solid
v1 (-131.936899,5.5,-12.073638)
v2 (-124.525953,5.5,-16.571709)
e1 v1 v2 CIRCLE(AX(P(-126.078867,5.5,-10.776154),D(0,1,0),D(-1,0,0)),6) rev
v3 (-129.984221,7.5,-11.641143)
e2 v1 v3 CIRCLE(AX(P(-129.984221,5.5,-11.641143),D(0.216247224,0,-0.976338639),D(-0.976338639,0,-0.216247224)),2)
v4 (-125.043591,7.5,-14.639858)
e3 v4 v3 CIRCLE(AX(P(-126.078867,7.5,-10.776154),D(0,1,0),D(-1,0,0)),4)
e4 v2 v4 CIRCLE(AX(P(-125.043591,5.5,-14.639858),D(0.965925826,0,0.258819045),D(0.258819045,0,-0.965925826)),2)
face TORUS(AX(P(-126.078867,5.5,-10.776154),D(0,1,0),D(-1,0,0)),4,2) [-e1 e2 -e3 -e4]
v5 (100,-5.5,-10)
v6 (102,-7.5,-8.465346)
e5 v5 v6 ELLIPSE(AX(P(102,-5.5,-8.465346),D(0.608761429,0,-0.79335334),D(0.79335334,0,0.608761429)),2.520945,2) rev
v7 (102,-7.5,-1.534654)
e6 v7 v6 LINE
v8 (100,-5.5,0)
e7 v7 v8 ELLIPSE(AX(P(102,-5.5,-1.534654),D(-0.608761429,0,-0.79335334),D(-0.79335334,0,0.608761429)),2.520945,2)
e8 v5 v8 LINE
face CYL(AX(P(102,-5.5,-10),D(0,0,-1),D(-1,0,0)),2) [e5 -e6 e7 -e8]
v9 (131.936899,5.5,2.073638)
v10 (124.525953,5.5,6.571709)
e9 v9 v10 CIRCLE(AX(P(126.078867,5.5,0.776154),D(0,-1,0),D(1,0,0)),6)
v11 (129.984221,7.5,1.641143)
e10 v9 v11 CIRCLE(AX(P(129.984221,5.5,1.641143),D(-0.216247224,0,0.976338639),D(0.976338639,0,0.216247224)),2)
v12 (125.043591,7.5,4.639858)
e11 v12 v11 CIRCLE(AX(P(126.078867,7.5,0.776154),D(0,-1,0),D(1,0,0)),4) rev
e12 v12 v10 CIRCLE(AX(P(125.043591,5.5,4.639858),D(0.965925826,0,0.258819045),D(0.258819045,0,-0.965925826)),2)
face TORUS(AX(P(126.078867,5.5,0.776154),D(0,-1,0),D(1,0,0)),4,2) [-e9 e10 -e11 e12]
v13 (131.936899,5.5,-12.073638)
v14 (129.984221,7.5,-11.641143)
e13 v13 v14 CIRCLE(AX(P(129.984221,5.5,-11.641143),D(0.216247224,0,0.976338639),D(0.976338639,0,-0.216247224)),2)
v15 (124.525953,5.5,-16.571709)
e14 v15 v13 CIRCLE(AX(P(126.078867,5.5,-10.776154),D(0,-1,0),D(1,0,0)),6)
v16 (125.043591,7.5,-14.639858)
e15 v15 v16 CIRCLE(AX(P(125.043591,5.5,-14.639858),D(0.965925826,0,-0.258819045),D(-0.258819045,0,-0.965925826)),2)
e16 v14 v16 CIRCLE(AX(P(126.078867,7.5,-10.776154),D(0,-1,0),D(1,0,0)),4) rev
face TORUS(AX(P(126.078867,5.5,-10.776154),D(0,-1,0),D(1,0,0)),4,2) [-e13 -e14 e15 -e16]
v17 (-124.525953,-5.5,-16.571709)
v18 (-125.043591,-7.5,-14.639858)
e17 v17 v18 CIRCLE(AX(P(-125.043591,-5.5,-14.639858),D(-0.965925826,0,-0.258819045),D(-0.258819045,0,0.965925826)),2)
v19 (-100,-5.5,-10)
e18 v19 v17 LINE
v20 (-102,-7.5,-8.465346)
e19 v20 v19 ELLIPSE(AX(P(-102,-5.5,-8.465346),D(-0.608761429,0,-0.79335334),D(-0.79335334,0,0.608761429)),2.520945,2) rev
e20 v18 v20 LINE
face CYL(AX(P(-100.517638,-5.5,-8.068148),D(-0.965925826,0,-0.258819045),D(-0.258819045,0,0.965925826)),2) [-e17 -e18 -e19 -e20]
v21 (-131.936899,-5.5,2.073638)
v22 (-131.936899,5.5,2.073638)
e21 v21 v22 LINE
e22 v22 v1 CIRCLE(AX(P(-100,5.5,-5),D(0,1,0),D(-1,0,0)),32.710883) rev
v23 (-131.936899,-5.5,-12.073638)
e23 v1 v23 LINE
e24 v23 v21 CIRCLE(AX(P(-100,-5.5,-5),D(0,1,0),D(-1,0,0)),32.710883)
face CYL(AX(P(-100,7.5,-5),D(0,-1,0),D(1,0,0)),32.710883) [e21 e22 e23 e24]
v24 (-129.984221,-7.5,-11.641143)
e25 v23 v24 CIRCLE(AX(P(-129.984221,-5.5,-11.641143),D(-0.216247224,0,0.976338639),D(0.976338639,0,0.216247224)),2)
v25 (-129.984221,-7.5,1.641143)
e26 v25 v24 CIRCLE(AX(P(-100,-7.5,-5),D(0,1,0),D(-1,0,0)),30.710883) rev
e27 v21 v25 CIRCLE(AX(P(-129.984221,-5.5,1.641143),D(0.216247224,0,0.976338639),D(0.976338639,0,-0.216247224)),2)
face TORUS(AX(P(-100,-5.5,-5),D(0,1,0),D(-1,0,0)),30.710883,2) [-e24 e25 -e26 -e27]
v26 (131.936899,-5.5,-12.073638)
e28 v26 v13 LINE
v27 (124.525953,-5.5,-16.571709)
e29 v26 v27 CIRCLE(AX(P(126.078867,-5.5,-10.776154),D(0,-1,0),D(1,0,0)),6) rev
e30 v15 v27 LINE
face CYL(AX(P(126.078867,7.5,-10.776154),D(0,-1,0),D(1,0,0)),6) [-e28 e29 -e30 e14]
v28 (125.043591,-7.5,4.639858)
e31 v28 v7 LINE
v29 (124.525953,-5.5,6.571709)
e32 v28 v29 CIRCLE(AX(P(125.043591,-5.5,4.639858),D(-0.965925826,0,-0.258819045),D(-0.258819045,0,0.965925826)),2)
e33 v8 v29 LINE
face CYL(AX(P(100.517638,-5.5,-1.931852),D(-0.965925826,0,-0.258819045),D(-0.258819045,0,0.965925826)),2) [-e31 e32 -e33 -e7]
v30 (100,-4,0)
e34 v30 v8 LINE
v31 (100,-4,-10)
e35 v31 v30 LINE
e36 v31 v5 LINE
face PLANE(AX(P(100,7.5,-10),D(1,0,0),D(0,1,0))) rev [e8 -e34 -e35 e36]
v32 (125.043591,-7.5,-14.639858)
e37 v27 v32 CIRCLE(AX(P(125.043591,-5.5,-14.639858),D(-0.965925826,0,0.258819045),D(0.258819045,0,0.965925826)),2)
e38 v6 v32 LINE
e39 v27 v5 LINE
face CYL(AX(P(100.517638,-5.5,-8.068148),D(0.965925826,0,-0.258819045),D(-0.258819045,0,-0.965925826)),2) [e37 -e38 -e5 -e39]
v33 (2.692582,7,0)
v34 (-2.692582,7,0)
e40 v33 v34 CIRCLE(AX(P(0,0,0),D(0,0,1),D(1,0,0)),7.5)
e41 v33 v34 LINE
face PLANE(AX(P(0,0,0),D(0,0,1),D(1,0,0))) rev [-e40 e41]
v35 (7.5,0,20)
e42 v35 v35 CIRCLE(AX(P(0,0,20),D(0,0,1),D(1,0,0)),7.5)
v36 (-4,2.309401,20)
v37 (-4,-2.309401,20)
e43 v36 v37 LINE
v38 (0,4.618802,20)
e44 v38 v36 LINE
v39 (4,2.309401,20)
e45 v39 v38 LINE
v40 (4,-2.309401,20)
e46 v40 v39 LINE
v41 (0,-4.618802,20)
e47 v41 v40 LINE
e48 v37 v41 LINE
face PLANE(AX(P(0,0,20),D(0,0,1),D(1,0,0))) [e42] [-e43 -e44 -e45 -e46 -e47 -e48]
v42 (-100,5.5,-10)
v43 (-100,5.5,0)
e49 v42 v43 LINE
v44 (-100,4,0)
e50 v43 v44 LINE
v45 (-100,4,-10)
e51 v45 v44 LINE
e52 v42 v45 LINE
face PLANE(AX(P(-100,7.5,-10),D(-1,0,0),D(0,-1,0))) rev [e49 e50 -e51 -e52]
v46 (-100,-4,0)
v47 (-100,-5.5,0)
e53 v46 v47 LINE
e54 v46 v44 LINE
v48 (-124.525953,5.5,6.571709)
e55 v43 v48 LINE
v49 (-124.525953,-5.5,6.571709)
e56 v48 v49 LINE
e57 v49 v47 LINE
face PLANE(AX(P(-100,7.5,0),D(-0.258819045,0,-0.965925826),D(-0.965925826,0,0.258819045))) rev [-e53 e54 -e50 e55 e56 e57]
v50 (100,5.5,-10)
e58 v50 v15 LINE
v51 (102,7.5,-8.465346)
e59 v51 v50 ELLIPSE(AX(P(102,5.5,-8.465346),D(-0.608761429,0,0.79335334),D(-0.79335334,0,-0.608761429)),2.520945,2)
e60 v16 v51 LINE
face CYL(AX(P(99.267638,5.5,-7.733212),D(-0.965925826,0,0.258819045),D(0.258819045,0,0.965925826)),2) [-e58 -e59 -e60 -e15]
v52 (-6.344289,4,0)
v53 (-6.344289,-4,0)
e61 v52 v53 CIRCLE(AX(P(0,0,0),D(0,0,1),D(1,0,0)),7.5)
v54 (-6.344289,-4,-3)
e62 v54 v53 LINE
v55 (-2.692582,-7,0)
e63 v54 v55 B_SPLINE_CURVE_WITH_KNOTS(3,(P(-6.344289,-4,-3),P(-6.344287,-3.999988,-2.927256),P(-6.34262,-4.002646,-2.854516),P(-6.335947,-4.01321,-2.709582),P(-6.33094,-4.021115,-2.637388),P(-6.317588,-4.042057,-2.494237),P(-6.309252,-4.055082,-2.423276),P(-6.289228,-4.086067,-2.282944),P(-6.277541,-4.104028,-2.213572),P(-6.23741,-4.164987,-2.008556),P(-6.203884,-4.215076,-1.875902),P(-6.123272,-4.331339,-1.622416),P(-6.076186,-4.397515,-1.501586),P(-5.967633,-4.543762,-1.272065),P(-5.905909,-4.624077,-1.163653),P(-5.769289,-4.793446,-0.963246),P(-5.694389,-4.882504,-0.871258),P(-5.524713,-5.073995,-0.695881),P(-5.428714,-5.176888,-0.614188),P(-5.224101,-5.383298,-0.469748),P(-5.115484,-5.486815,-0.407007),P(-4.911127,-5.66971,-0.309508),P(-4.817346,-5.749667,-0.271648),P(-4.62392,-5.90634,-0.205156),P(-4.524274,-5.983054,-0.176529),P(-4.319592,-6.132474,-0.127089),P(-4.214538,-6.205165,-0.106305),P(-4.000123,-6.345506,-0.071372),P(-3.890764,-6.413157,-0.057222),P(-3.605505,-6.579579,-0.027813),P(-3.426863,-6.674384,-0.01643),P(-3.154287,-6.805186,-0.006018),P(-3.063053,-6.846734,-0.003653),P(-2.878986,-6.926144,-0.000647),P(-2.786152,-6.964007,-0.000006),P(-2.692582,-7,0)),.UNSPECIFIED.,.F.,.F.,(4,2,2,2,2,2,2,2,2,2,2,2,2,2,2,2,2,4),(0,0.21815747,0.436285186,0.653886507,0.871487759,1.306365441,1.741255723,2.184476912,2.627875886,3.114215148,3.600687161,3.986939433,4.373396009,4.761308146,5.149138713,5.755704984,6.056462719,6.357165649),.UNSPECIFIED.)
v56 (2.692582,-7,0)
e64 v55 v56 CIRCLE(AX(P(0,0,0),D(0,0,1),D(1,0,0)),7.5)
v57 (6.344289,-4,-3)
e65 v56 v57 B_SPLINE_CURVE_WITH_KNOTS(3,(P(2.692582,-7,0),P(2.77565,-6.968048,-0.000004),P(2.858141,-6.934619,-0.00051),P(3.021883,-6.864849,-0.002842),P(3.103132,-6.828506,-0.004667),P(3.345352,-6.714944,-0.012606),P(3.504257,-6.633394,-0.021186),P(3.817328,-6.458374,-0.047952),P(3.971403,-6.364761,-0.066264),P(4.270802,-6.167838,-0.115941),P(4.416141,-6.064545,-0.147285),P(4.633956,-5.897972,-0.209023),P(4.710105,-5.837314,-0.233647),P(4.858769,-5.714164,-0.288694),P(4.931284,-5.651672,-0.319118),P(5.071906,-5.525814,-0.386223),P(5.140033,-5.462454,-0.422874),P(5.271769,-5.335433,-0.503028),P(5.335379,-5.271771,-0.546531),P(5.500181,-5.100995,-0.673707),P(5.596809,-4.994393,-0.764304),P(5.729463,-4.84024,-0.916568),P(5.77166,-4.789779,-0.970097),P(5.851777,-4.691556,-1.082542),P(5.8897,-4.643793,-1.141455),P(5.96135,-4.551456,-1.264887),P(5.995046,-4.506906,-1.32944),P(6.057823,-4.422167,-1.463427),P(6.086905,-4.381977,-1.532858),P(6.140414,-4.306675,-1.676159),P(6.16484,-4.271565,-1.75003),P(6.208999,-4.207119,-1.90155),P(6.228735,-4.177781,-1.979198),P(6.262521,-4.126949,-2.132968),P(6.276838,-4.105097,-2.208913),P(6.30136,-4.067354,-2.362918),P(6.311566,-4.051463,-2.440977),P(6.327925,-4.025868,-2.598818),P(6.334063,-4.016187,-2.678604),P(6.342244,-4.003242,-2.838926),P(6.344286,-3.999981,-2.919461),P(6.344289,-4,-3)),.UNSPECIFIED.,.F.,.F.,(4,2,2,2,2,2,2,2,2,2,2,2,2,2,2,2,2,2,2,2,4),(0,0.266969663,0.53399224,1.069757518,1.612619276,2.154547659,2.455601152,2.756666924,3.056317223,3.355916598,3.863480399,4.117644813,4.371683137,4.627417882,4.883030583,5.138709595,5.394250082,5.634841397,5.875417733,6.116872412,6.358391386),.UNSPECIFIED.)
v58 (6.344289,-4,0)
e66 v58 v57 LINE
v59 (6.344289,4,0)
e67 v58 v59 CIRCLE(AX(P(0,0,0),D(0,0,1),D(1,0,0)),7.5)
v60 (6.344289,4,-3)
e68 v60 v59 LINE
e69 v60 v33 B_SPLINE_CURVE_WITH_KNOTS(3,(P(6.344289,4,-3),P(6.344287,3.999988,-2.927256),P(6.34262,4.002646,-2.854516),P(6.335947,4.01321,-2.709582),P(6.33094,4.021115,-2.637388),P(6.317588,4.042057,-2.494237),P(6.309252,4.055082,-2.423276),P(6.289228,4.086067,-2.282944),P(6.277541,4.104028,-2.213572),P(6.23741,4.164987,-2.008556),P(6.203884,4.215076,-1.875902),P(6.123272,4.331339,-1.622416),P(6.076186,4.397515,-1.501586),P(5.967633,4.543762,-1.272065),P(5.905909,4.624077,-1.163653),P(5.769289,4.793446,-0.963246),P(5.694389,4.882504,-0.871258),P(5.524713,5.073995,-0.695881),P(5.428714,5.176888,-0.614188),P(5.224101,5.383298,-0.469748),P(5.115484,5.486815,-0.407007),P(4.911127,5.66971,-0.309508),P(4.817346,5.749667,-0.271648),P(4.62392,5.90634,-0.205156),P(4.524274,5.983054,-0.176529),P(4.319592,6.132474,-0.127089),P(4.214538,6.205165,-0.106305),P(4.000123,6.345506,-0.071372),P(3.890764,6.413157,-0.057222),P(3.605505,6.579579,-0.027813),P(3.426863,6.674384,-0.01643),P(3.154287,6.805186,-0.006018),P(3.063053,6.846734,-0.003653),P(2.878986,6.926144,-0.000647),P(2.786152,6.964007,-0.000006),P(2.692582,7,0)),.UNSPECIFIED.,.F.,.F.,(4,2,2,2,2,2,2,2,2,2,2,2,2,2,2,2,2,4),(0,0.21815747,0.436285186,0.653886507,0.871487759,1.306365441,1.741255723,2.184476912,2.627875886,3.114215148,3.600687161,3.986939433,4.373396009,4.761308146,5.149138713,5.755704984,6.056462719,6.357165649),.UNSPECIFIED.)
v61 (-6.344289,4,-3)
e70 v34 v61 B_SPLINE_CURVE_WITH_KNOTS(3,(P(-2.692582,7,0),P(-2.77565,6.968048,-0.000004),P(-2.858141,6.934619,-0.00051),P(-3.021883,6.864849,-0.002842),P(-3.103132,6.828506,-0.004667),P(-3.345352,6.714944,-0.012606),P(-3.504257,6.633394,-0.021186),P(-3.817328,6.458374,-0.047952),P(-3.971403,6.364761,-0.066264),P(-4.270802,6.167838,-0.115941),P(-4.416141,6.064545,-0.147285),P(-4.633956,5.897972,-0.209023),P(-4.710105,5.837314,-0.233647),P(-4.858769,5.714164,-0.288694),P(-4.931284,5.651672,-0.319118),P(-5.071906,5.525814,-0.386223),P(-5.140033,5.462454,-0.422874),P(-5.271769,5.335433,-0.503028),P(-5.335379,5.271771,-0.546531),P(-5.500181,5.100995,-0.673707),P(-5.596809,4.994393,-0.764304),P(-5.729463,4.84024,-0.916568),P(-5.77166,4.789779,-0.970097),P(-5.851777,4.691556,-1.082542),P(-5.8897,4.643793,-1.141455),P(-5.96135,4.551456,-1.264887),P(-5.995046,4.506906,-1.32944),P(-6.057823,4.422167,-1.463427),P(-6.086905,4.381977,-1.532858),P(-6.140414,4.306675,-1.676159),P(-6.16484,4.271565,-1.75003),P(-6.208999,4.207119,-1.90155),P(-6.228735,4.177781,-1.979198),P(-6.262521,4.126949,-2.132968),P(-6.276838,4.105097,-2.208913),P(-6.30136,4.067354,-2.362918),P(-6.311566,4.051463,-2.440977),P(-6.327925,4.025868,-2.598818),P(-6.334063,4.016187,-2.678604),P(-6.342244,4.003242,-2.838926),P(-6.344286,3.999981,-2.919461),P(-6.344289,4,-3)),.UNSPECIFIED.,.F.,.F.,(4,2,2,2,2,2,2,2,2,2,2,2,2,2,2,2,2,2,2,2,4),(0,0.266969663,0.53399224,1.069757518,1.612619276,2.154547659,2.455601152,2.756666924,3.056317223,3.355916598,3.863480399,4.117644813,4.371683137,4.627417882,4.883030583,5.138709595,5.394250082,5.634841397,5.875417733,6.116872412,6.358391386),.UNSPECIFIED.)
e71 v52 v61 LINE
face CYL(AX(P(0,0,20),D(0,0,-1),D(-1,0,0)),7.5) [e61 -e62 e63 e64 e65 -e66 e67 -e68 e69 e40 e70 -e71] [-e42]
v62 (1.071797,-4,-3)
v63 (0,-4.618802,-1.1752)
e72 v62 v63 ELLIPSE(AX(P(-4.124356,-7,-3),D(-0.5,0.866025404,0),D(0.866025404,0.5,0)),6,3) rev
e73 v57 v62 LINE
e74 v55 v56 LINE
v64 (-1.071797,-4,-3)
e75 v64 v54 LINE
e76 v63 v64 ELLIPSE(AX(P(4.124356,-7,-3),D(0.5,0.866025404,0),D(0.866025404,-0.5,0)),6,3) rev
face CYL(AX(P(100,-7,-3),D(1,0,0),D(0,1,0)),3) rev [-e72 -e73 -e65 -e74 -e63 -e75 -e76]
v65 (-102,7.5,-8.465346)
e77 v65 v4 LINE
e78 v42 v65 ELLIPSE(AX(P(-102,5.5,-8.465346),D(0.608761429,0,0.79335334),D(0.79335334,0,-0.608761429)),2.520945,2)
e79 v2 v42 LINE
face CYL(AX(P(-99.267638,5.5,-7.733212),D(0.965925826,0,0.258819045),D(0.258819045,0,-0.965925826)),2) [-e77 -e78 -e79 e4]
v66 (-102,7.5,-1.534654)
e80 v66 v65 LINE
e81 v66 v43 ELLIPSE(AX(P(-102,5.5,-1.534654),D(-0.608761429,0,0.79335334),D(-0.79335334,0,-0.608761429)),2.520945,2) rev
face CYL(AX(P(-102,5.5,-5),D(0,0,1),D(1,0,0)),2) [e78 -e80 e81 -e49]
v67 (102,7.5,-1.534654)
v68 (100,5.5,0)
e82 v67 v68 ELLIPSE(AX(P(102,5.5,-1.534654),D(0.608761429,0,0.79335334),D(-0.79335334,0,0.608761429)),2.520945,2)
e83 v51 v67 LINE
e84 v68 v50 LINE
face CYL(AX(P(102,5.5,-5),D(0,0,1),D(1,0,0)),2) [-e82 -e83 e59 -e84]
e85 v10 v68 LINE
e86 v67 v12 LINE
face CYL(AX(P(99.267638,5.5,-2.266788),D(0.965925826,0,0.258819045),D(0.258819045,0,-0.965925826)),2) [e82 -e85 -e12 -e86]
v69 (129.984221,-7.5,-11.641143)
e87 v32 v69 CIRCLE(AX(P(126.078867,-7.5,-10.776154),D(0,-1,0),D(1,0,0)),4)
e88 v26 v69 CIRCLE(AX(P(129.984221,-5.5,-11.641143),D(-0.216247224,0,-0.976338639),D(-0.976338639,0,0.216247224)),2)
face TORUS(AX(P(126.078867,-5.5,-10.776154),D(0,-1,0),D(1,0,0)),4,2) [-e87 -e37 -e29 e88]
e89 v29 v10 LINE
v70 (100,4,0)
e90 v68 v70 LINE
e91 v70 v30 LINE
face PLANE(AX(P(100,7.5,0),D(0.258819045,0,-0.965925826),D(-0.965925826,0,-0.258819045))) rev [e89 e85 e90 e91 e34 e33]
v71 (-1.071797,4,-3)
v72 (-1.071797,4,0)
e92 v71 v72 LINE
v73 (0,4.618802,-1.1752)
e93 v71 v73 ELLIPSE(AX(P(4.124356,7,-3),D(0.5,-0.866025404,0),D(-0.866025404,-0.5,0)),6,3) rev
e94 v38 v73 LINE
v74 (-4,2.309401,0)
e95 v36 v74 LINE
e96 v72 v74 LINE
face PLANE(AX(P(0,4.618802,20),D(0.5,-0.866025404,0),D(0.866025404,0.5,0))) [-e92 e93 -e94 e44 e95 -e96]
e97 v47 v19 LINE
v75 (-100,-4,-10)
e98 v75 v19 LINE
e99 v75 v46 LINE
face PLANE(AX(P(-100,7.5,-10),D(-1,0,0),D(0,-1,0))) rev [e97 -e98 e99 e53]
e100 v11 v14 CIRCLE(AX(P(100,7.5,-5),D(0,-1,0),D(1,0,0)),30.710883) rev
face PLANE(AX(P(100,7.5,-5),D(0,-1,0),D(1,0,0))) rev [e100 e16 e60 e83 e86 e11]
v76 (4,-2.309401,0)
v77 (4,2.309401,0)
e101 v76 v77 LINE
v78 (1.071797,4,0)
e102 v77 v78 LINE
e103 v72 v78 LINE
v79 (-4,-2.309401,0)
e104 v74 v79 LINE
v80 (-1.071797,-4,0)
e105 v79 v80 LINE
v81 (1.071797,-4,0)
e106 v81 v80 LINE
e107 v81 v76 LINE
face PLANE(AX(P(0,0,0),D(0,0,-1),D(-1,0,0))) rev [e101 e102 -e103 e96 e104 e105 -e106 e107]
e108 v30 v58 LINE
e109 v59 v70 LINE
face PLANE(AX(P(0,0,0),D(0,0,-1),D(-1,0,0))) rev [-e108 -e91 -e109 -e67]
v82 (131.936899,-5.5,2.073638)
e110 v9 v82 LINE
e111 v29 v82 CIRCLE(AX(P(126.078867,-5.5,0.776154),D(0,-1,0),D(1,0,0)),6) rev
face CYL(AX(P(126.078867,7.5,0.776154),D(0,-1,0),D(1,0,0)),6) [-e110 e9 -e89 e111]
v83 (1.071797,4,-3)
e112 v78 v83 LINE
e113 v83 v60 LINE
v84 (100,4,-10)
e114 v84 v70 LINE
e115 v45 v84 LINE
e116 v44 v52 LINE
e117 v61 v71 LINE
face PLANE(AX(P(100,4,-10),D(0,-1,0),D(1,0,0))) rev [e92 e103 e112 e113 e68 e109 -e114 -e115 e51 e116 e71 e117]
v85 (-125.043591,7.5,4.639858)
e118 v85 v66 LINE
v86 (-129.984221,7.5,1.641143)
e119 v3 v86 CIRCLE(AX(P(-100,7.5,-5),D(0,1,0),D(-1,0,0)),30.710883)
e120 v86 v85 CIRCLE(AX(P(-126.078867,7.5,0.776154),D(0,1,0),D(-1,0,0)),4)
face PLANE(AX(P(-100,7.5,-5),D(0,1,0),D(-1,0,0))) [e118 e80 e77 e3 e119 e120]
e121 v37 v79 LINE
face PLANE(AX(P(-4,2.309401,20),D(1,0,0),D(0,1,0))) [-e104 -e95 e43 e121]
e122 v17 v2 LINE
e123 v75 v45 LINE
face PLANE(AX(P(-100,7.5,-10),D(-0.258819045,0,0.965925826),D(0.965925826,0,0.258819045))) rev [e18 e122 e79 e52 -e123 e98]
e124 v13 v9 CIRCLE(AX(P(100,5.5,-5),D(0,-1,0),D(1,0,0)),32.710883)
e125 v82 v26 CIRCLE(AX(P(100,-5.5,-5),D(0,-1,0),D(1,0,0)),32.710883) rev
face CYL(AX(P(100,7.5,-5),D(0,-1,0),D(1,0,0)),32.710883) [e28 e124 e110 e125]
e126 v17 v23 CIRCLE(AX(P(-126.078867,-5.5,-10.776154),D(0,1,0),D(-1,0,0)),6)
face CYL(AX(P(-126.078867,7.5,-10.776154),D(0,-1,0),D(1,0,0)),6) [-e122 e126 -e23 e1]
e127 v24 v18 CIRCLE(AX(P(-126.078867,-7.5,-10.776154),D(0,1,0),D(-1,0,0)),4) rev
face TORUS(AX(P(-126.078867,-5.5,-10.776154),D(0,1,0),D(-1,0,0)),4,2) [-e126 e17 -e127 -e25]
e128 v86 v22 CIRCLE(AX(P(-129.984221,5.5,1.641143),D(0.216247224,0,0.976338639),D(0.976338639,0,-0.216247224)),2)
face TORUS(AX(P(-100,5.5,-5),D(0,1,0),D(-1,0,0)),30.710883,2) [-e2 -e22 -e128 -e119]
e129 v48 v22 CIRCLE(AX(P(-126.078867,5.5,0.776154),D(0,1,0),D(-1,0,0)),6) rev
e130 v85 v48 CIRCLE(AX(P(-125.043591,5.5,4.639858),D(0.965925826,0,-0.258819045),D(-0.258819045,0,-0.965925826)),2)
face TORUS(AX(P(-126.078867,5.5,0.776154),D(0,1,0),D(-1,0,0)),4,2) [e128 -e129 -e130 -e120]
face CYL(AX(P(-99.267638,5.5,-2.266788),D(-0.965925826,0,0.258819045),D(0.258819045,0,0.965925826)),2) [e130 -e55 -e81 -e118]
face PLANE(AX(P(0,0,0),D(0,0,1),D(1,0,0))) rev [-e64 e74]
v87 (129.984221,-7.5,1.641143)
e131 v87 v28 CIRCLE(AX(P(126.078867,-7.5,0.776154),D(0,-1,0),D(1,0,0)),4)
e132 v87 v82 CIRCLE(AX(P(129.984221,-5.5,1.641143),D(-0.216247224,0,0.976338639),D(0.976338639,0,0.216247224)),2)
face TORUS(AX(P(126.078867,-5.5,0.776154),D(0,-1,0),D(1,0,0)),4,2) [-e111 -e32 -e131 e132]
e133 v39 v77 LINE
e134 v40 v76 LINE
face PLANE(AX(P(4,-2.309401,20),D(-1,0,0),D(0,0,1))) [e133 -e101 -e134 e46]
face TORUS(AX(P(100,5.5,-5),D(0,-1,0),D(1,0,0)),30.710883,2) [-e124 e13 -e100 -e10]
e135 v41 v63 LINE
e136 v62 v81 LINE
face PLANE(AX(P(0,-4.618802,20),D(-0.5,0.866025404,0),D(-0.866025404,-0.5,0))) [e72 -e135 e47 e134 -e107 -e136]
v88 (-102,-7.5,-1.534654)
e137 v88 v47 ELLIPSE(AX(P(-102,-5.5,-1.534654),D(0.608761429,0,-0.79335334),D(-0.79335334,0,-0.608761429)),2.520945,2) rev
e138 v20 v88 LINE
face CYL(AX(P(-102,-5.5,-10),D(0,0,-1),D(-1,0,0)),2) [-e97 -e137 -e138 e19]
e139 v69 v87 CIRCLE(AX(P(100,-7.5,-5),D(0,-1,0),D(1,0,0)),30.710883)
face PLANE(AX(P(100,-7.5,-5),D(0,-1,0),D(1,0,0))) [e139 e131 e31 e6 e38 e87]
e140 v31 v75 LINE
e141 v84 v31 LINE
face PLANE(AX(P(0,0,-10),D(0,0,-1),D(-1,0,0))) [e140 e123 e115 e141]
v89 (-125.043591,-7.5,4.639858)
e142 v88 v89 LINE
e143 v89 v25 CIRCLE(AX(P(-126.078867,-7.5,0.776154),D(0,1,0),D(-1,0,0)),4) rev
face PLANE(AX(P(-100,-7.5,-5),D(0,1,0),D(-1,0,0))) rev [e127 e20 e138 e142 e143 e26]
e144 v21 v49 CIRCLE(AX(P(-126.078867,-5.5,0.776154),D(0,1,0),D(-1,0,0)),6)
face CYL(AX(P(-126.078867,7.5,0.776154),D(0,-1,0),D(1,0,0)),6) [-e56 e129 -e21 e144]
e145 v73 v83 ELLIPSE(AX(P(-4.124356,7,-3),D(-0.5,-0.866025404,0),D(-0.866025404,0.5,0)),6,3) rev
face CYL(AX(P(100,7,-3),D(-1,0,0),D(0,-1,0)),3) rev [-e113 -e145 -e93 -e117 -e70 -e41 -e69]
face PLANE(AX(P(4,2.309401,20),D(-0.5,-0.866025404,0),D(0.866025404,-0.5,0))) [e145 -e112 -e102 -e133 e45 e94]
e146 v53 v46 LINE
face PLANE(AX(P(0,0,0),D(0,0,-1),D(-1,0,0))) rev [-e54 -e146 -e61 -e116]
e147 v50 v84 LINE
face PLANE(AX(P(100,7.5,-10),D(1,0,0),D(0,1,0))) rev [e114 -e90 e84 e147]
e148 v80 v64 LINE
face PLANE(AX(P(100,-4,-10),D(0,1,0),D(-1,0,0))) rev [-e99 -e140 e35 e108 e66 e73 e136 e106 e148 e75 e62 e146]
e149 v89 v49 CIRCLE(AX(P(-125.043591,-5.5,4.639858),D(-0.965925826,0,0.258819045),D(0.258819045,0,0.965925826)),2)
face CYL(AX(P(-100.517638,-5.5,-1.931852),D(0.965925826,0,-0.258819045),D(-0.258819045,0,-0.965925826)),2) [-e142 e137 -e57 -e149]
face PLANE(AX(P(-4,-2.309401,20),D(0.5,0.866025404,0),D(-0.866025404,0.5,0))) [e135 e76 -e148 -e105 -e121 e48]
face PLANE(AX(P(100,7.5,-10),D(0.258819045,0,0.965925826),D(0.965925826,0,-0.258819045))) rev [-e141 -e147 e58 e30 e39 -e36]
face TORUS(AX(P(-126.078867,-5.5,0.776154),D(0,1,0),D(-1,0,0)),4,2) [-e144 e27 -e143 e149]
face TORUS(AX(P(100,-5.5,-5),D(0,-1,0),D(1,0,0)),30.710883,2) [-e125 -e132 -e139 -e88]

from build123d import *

# Parameters (mm, degrees)
SKETCH_1_R      = 7.5
EXTRUDE_1_DEPTH = 20
SKETCH_2_W      = 200
SKETCH_2_H      = 8
EXTRUDE_2_DEPTH = 10
EXTRUDE_3_DEPTH = 7.5
FILLET_2_R      = 6
FILLET_3_R      = 2
FILLET_4_R      = 3


with BuildPart() as part:
    # 草图1 → 凸台-拉伸1 (new body)
    with BuildSketch(Plane.XY):
        Circle(SKETCH_1_R)
        Polygon((0, -4.618802154), (4, -2.309401077), (4, 2.309401077), (0, 4.618802154), (-4, 2.309401077), (-4, -2.309401077), align=None, mode=Mode.SUBTRACT)
    extrude(amount=EXTRUDE_1_DEPTH)

    # 草图2 → 凸台-拉伸2 (add)
    with BuildSketch(Plane(origin=(0, 0, 0), x_dir=(-1, 0, 0), z_dir=(0, 0, -1))):
        Rectangle(SKETCH_2_W, SKETCH_2_H)
    extrude(amount=EXTRUDE_2_DEPTH)

    # 草图3 → 凸台-拉伸3 (add, symmetric)
    with BuildSketch(Plane(origin=(0, 0, 0), x_dir=(1, 0, 0), z_dir=(0, 1, 0))):
        with BuildLine():
            Line((-100, 10), (-130, 18.038475773))
            ThreePointArc((-130, 18.038475773), (-132.710882753, 5), (-130, -8.038475773))
            Line((-130, -8.038475773), (-100, 0))
            Line((-100, 0), (-100, 10))
        make_face()
        with BuildLine():
            Line((100, 10), (100, 0))
            Line((100, 0), (130, -8.038475773))
            ThreePointArc((130, -8.038475773), (132.710882753, 5), (130, 18.038475773))
            Line((130, 18.038475773), (100, 10))
        make_face()
    extrude(amount=EXTRUDE_3_DEPTH, both=True)

    # 圆角2
    fillet_2_edges = [part.edges().sort_by_distance(p)[0] for p in [
        (-130, 0, -18.038475773),
        (-130, 0, 8.038475773),
        (130, 0, 8.038475773),
        (130, 0, -18.038475773),
    ]]
    fillet(fillet_2_edges, radius=FILLET_2_R)

    # 圆角3
    fillet_3_edges = [part.edges().sort_by_distance(p)[0] for p in [
        (-100, -7.5, -5),
        (-112.262976322, -7.5, -13.285854602),
        (-100, 7.5, -5),
        (-112.262976322, 7.5, -13.285854602),
        (100, -7.5, -5),
        (112.262976322, -7.5, 3.285854602),
        (100, 7.5, -5),
        (112.262976322, 7.5, 3.285854602),
        (-132.710882753, -7.5, -5),
        (-132.710882753, 7.5, -5),
        (-112.262976322, -7.5, 3.285854602),
        (-129.192011847, -7.5, 5.905318763),
        (-129.192011847, -7.5, -15.905318763),
        (-112.262976322, 7.5, 3.285854602),
        (-129.192011847, 7.5, 5.905318763),
        (-129.192011847, 7.5, -15.905318763),
        (112.262976322, -7.5, -13.285854602),
        (112.262976322, 7.5, -13.285854602),
        (132.710882753, -7.5, -5),
        (129.192011847, -7.5, 5.905318763),
        (129.192011847, -7.5, -15.905318763),
        (132.710882753, 7.5, -5),
        (129.192011847, 7.5, 5.905318763),
        (129.192011847, 7.5, -15.905318763),
    ]]
    fillet(fillet_3_edges, radius=FILLET_3_R)

    # 圆角4
    # the kernel refuses this fillet: 3 mm, written as the material it adds along each edge
    with BuildSketch(Plane(origin=(-6.42820323, -4, 0), x_dir=(0, 0, -1), z_dir=(1, 0, 0))) as fillet_4_piece_1_section:
        with BuildLine():
            CenterArc((FILLET_4_R, -FILLET_4_R), FILLET_4_R, 90, 90)
            Line((0, -FILLET_4_R), (0, 0))
            Line((0, 0), (FILLET_4_R, 0))
        make_face()
    fillet_4_piece_1 = extrude(amount=20.272492001, mode=Mode.PRIVATE)
    fillet_4_piece_1 = fillet_4_piece_1 & Plane(origin=(0, 0, -0.715829883), x_dir=(1, 0, 0), z_dir=(0, 0, -1)) * Cylinder(7.5, 53, mode=Mode.PRIVATE)
    fillet_4_piece_1 = split(fillet_4_piece_1, bisect_by=Plane(origin=(-2.485789841, -3.18363072, -0.715829883), z_dir=(-0.5000000000000003, -0.8660254037844387, 0)), keep=Keep.TOP, mode=Mode.PRIVATE)
    add(fillet_4_piece_1)
    with BuildSketch(Plane(origin=(-6.42820323, -4, 0), x_dir=(0, 0, -1), z_dir=(1, 0, 0))) as fillet_4_piece_2_section:
        with BuildLine():
            CenterArc((FILLET_4_R, -FILLET_4_R), FILLET_4_R, 90, 90)
            Line((0, -FILLET_4_R), (0, 0))
            Line((0, 0), (FILLET_4_R, 0))
        make_face()
    fillet_4_piece_2 = extrude(amount=20.272492001, mode=Mode.PRIVATE)
    fillet_4_piece_2 = fillet_4_piece_2 & Plane(origin=(0, 0, -0.715830721), x_dir=(1, 0, 0), z_dir=(0, 0, -1)) * Cylinder(7.5, 53, mode=Mode.PRIVATE)
    fillet_4_piece_2 = split(fillet_4_piece_2, bisect_by=Plane(origin=(2.485790597, -3.183630283, -0.715830721), z_dir=(0.4999999999999999, -0.8660254037844388, 0)), keep=Keep.TOP, mode=Mode.PRIVATE)
    add(fillet_4_piece_2)
    with BuildSketch(Plane(origin=(-13.84428877, -4, 0), x_dir=(0, 0, -1), z_dir=(1, 0, 0))) as fillet_4_piece_3_section:
        with BuildLine():
            CenterArc((FILLET_4_R, -FILLET_4_R), FILLET_4_R, 90, 90)
            Line((0, -FILLET_4_R), (0, 0))
            Line((0, 0), (FILLET_4_R, 0))
        make_face()
    fillet_4_piece_3 = extrude(amount=20.272492001, mode=Mode.PRIVATE)
    fillet_4_piece_3 = fillet_4_piece_3 & Plane(origin=(0, 0, -0.715829883), x_dir=(1, 0, 0), z_dir=(0, 0, -1)) * Cylinder(7.5, 53, mode=Mode.PRIVATE)
    fillet_4_piece_3 = split(fillet_4_piece_3, bisect_by=Plane(origin=(-2.485789841, -3.18363072, -0.715829883), z_dir=(-0.5000000000000003, -0.8660254037844387, 0)), keep=Keep.TOP, mode=Mode.PRIVATE)
    add(fillet_4_piece_3)
    with BuildSketch(Plane(origin=(-13.84428877, -4, 0), x_dir=(0, 0, -1), z_dir=(1, 0, 0))) as fillet_4_piece_4_section:
        with BuildLine():
            CenterArc((FILLET_4_R, -FILLET_4_R), FILLET_4_R, 90, 90)
            Line((0, -FILLET_4_R), (0, 0))
            Line((0, 0), (FILLET_4_R, 0))
        make_face()
    fillet_4_piece_4 = extrude(amount=20.272492001, mode=Mode.PRIVATE)
    fillet_4_piece_4 = fillet_4_piece_4 & Plane(origin=(0, 0, -0.715830721), x_dir=(1, 0, 0), z_dir=(0, 0, -1)) * Cylinder(7.5, 53, mode=Mode.PRIVATE)
    fillet_4_piece_4 = split(fillet_4_piece_4, bisect_by=Plane(origin=(2.485790597, -3.183630283, -0.715830721), z_dir=(0.4999999999999999, -0.8660254037844388, 0)), keep=Keep.TOP, mode=Mode.PRIVATE)
    add(fillet_4_piece_4)
    with BuildSketch(Plane(origin=(6.42820323, 4, 0), x_dir=(0, 0, -1), z_dir=(-1, 0, 0))) as fillet_4_piece_5_section:
        with BuildLine():
            CenterArc((FILLET_4_R, -FILLET_4_R), FILLET_4_R, 90, 90)
            Line((0, -FILLET_4_R), (0, 0))
            Line((0, 0), (FILLET_4_R, 0))
        make_face()
    fillet_4_piece_5 = extrude(amount=20.272492001, mode=Mode.PRIVATE)
    fillet_4_piece_5 = fillet_4_piece_5 & Plane(origin=(0, 0, -0.715829883), x_dir=(1, 0, 0), z_dir=(0, 0, -1)) * Cylinder(7.5, 53, mode=Mode.PRIVATE)
    fillet_4_piece_5 = split(fillet_4_piece_5, bisect_by=Plane(origin=(2.485789841, 3.18363072, -0.715829883), z_dir=(0.5, 0.8660254037844387, 0)), keep=Keep.TOP, mode=Mode.PRIVATE)
    add(fillet_4_piece_5)
    with BuildSketch(Plane(origin=(6.42820323, 4, 0), x_dir=(0, 0, -1), z_dir=(-1, 0, 0))) as fillet_4_piece_6_section:
        with BuildLine():
            CenterArc((FILLET_4_R, -FILLET_4_R), FILLET_4_R, 90, 90)
            Line((0, -FILLET_4_R), (0, 0))
            Line((0, 0), (FILLET_4_R, 0))
        make_face()
    fillet_4_piece_6 = extrude(amount=20.272492001, mode=Mode.PRIVATE)
    fillet_4_piece_6 = fillet_4_piece_6 & Plane(origin=(0, 0, -0.715830721), x_dir=(1, 0, 0), z_dir=(0, 0, -1)) * Cylinder(7.5, 53, mode=Mode.PRIVATE)
    fillet_4_piece_6 = split(fillet_4_piece_6, bisect_by=Plane(origin=(-2.485790597, 3.183630283, -0.715830721), z_dir=(-0.5000000000000001, 0.8660254037844387, 0)), keep=Keep.TOP, mode=Mode.PRIVATE)
    add(fillet_4_piece_6)
    with BuildSketch(Plane(origin=(13.84428877, 4, 0), x_dir=(0, 0, -1), z_dir=(-1, 0, 0))) as fillet_4_piece_7_section:
        with BuildLine():
            CenterArc((FILLET_4_R, -FILLET_4_R), FILLET_4_R, 90, 90)
            Line((0, -FILLET_4_R), (0, 0))
            Line((0, 0), (FILLET_4_R, 0))
        make_face()
    fillet_4_piece_7 = extrude(amount=20.272492001, mode=Mode.PRIVATE)
    fillet_4_piece_7 = fillet_4_piece_7 & Plane(origin=(0, 0, -0.715829883), x_dir=(1, 0, 0), z_dir=(0, 0, -1)) * Cylinder(7.5, 53, mode=Mode.PRIVATE)
    fillet_4_piece_7 = split(fillet_4_piece_7, bisect_by=Plane(origin=(2.485789841, 3.18363072, -0.715829883), z_dir=(0.5, 0.8660254037844387, 0)), keep=Keep.TOP, mode=Mode.PRIVATE)
    add(fillet_4_piece_7)
    with BuildSketch(Plane(origin=(13.84428877, 4, 0), x_dir=(0, 0, -1), z_dir=(-1, 0, 0))) as fillet_4_piece_8_section:
        with BuildLine():
            CenterArc((FILLET_4_R, -FILLET_4_R), FILLET_4_R, 90, 90)
            Line((0, -FILLET_4_R), (0, 0))
            Line((0, 0), (FILLET_4_R, 0))
        make_face()
    fillet_4_piece_8 = extrude(amount=20.272492001, mode=Mode.PRIVATE)
    fillet_4_piece_8 = fillet_4_piece_8 & Plane(origin=(0, 0, -0.715830721), x_dir=(1, 0, 0), z_dir=(0, 0, -1)) * Cylinder(7.5, 53, mode=Mode.PRIVATE)
    fillet_4_piece_8 = split(fillet_4_piece_8, bisect_by=Plane(origin=(-2.485790597, 3.183630283, -0.715830721), z_dir=(-0.5000000000000001, 0.8660254037844387, 0)), keep=Keep.TOP, mode=Mode.PRIVATE)
    add(fillet_4_piece_8)


solid = part.part
